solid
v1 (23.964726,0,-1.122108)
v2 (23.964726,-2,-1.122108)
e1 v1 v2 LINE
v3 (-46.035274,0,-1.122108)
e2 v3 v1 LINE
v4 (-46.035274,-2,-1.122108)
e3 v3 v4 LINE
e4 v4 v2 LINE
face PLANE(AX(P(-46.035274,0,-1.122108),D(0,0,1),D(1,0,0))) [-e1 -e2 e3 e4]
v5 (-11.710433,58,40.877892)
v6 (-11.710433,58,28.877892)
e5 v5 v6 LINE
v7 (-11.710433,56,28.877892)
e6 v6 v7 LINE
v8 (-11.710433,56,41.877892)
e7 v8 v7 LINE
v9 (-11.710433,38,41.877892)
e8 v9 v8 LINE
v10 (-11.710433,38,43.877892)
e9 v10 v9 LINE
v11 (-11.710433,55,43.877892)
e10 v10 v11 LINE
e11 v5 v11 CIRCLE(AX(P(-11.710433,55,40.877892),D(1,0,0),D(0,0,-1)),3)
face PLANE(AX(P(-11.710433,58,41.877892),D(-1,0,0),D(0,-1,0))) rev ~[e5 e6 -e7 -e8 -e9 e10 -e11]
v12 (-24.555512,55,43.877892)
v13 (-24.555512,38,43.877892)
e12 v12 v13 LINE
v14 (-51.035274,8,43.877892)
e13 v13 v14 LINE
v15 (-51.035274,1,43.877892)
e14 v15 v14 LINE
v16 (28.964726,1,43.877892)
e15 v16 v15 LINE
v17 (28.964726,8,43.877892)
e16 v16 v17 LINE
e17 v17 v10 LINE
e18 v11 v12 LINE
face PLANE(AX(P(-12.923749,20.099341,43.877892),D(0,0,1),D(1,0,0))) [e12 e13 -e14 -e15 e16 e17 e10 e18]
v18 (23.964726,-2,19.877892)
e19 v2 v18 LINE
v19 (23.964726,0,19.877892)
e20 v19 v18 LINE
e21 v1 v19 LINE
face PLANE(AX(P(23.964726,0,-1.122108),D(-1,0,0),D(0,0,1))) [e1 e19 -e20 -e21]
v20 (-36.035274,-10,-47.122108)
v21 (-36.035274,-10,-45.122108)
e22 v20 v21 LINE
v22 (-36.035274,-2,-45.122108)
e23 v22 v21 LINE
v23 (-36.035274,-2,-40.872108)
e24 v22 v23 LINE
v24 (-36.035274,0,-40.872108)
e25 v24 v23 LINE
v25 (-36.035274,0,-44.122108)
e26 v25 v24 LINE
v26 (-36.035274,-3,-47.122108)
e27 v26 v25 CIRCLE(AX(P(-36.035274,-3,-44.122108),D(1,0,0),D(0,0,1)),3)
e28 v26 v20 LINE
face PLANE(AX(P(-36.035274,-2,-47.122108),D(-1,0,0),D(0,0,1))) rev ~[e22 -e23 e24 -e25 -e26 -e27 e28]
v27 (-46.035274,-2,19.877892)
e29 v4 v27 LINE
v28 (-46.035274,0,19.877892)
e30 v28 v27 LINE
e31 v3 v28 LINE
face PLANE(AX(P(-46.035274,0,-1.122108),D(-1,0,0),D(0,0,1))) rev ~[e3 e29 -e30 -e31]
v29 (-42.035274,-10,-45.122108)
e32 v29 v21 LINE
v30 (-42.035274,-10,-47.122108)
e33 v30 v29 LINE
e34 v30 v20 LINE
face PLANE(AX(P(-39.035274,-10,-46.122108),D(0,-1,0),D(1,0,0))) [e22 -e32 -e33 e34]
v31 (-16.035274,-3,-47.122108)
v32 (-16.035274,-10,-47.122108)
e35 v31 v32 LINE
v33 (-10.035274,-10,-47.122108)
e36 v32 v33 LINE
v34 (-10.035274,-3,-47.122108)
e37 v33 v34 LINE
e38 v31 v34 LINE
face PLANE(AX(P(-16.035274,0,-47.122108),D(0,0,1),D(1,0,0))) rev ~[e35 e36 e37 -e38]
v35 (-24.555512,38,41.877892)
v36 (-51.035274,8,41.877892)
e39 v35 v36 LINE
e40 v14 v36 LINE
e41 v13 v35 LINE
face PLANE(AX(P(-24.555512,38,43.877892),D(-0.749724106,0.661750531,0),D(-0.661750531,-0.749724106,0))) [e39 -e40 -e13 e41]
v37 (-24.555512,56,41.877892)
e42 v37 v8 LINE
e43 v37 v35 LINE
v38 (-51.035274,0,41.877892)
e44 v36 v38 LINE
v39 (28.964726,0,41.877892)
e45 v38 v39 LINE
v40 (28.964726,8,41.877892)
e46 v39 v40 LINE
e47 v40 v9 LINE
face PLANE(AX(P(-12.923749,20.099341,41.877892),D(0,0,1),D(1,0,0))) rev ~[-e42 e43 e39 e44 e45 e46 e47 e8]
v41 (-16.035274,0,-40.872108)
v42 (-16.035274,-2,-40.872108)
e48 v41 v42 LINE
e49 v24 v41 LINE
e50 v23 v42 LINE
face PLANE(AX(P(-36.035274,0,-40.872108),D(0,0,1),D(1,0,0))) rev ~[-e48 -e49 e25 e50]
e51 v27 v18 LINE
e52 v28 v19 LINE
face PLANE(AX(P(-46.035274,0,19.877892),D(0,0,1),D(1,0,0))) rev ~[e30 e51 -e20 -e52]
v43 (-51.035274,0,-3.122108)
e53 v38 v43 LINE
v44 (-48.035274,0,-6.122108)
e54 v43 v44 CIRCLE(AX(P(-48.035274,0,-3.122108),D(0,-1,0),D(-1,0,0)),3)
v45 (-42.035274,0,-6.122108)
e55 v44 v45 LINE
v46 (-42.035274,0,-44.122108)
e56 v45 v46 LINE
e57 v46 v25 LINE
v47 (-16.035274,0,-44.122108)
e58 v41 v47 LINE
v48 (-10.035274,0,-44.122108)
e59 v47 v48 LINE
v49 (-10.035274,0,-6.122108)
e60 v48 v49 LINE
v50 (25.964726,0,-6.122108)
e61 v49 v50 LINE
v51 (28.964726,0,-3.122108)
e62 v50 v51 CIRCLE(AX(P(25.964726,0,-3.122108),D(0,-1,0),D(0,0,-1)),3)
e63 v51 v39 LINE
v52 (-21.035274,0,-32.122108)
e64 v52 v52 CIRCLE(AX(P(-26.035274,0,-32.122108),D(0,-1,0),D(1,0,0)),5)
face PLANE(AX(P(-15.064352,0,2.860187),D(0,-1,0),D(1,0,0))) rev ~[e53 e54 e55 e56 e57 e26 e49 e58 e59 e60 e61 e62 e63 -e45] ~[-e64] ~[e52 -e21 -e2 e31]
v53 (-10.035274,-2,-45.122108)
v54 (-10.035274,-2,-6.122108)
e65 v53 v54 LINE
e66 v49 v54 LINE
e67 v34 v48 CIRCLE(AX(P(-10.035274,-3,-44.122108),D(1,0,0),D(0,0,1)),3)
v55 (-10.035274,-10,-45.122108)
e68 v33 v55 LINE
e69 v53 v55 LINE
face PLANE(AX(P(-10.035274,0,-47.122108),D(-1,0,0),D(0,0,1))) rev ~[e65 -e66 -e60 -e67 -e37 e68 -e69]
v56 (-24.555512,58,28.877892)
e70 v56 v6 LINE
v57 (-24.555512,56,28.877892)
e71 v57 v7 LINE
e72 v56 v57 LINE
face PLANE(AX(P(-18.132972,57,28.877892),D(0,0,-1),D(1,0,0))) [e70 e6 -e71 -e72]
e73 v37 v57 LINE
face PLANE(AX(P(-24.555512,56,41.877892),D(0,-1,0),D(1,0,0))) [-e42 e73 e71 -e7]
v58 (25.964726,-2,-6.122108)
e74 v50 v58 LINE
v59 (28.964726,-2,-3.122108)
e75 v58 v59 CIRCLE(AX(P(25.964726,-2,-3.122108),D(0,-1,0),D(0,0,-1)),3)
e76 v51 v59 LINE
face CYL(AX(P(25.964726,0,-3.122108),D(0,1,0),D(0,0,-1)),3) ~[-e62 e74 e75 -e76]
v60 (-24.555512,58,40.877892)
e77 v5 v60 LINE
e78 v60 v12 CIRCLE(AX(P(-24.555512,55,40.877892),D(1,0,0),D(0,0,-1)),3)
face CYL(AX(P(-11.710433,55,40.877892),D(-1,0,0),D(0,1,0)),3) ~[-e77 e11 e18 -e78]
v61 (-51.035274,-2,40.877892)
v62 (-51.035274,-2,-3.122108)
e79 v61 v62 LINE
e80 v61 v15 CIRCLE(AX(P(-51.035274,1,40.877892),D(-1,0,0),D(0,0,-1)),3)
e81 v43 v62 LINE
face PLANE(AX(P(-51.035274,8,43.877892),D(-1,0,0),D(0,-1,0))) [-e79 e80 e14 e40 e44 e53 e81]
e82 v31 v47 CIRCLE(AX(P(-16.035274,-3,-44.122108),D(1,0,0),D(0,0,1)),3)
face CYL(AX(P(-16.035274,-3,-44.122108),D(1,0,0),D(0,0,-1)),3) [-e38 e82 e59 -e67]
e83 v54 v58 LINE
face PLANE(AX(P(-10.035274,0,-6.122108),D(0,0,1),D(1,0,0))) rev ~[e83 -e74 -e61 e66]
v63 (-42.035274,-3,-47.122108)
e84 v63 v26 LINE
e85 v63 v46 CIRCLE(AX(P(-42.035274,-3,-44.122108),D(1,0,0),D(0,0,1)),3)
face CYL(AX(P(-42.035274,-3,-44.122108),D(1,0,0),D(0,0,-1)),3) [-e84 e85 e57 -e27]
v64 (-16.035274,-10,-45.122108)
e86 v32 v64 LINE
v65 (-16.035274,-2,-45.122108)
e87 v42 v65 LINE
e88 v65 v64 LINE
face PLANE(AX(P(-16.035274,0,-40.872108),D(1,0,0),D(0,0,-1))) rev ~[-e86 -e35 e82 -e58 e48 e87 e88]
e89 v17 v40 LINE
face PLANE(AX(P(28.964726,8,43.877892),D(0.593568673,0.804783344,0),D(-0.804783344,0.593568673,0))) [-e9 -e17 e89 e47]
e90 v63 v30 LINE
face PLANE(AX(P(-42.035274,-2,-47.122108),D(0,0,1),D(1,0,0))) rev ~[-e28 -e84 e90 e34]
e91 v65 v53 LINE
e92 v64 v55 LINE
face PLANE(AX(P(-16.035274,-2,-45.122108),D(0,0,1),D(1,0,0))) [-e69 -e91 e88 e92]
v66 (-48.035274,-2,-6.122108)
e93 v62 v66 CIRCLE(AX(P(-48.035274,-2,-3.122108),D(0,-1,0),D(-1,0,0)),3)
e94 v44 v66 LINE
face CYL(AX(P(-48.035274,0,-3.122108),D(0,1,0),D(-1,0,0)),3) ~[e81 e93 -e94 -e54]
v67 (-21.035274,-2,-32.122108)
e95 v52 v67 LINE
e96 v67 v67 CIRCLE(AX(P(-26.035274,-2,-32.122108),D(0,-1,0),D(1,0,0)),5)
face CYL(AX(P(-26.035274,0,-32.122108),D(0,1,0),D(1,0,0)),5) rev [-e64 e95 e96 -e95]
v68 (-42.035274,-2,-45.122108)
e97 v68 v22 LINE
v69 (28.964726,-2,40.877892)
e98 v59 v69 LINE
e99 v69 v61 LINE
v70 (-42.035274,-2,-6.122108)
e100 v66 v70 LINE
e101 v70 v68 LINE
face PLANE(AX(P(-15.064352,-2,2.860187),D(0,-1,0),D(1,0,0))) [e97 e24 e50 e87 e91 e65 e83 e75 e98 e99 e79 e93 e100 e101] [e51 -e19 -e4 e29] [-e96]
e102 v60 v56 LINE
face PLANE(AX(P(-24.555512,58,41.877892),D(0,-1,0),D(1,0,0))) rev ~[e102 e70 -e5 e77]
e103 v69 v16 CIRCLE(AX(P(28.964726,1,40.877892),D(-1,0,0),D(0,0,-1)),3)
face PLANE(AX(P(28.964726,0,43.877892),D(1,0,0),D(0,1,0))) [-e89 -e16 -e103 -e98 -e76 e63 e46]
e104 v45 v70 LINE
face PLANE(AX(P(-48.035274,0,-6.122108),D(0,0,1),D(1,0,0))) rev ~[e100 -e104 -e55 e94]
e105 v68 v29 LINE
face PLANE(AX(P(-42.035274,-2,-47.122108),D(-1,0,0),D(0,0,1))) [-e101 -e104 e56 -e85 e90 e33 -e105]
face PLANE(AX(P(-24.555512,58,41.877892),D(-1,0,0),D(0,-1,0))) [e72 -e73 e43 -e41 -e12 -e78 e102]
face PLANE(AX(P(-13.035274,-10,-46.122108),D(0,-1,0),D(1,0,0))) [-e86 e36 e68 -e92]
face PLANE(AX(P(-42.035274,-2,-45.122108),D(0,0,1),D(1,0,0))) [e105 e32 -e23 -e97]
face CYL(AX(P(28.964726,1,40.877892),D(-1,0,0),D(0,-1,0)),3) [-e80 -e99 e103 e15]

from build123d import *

# Parameters (mm, degrees)
F0_R     = 5
F0_W     = 70
F0_H     = 21
F1_DEPTH = 2
F2_W     = 6
F2_H     = 2
F3_DEPTH = 8
F4_R     = 3
F6_DEPTH = 2
F7_W     = 12.8450786794
F7_H     = 2
F8_DEPTH = 13
F9_R     = 3


with BuildPart() as f1:
    # F0 (on Front) → F1 (new body)
    with BuildSketch(Plane.XZ):
        with BuildLine():
            Line((28.9647261798, 43.8778921962), (-51.0352738202, 43.8778921962))
            Line((-51.0352738202, 43.8778921962), (-51.0352738202, -3.1221078038))
            ThreePointArc((-51.0352738202, -3.1221078038), (-50.1565941637, -5.2434281474), (-48.0352738202, -6.1221078038))
            Line((-48.0352738202, -6.1221078038), (-42.0352738202, -6.1221078038))
            Line((-42.0352738202, -6.1221078038), (-42.0352738202, -47.1221078038))
            Line((-42.0352738202, -47.1221078038), (-36.0352738202, -47.1221078038))
            Line((-36.0352738202, -47.1221078038), (-36.0352738202, -40.8721078038))
            Line((-36.0352738202, -40.8721078038), (-16.0352738202, -40.8721078038))
            Line((-16.0352738202, -40.8721078038), (-16.0352738202, -47.1221078038))
            Line((-16.0352738202, -47.1221078038), (-10.0352738202, -47.1221078038))
            Line((-10.0352738202, -47.1221078038), (-10.0352738202, -6.1221078038))
            Line((-10.0352738202, -6.1221078038), (25.9647261798, -6.1221078038))
            ThreePointArc((25.9647261798, -6.1221078038), (28.0860465234, -5.2434281474), (28.9647261798, -3.1221078038))
            Line((28.9647261798, -3.1221078038), (28.9647261798, 43.8778921962))
        make_face()
        with Locations((-26.0352738202, -32.1221078038)):
            Circle(F0_R, mode=Mode.SUBTRACT)
        with Locations((-11.0352738202, 9.3778921962)):
            Rectangle(F0_W, F0_H, mode=Mode.SUBTRACT)
    extrude(amount=F1_DEPTH)

    # F2 (on face) → F3 (join)
    with BuildSketch(Plane.XZ.offset(2)):
        with Locations((-39.0352738202, -46.1221078038)):
            Rectangle(F2_W, F2_H)
        with Locations((-13.0352738202, -46.1221078038)):
            Rectangle(F2_W, F2_H)
    extrude(amount=F3_DEPTH)

    # F4
    f4_edges = [f1.edges().sort_by_distance(p)[0] for p in [
        (-13.035274, 0, -47.122108),
        (-39.035274, 0, -47.122108),
    ]]
    fillet(f4_edges, radius=F4_R)

    # F5 (on face) → F6 (join)
    with BuildSketch(Plane.XY.offset(43.8778921962)):
        Polygon((-51.0352738202, 8), (-51.0352738202, 0), (28.9647261798, 0), (28.9647261798, 8), (-11.7104330932, 38), (-11.7104330932, 58), (-24.5555117726, 58), (-24.5555117726, 38), align=None)
    extrude(amount=-F6_DEPTH)

    # F7 (on face) → F8 (join)
    with BuildSketch(Plane(origin=(0, 0, 41.8778921962), x_dir=(1, 0, 0), z_dir=(0, 0, -1))):
        with Locations((-18.1329724329, -57)):
            Rectangle(F7_W, F7_H)
    extrude(amount=F8_DEPTH)

    # F9
    f9_edges = [f1.edges().sort_by_distance(p)[0] for p in [
        (-18.132972, 58, 43.877892),
        (-11.035274, -2, 43.877892),
    ]]
    fillet(f9_edges, radius=F9_R)


solid = f1.part
